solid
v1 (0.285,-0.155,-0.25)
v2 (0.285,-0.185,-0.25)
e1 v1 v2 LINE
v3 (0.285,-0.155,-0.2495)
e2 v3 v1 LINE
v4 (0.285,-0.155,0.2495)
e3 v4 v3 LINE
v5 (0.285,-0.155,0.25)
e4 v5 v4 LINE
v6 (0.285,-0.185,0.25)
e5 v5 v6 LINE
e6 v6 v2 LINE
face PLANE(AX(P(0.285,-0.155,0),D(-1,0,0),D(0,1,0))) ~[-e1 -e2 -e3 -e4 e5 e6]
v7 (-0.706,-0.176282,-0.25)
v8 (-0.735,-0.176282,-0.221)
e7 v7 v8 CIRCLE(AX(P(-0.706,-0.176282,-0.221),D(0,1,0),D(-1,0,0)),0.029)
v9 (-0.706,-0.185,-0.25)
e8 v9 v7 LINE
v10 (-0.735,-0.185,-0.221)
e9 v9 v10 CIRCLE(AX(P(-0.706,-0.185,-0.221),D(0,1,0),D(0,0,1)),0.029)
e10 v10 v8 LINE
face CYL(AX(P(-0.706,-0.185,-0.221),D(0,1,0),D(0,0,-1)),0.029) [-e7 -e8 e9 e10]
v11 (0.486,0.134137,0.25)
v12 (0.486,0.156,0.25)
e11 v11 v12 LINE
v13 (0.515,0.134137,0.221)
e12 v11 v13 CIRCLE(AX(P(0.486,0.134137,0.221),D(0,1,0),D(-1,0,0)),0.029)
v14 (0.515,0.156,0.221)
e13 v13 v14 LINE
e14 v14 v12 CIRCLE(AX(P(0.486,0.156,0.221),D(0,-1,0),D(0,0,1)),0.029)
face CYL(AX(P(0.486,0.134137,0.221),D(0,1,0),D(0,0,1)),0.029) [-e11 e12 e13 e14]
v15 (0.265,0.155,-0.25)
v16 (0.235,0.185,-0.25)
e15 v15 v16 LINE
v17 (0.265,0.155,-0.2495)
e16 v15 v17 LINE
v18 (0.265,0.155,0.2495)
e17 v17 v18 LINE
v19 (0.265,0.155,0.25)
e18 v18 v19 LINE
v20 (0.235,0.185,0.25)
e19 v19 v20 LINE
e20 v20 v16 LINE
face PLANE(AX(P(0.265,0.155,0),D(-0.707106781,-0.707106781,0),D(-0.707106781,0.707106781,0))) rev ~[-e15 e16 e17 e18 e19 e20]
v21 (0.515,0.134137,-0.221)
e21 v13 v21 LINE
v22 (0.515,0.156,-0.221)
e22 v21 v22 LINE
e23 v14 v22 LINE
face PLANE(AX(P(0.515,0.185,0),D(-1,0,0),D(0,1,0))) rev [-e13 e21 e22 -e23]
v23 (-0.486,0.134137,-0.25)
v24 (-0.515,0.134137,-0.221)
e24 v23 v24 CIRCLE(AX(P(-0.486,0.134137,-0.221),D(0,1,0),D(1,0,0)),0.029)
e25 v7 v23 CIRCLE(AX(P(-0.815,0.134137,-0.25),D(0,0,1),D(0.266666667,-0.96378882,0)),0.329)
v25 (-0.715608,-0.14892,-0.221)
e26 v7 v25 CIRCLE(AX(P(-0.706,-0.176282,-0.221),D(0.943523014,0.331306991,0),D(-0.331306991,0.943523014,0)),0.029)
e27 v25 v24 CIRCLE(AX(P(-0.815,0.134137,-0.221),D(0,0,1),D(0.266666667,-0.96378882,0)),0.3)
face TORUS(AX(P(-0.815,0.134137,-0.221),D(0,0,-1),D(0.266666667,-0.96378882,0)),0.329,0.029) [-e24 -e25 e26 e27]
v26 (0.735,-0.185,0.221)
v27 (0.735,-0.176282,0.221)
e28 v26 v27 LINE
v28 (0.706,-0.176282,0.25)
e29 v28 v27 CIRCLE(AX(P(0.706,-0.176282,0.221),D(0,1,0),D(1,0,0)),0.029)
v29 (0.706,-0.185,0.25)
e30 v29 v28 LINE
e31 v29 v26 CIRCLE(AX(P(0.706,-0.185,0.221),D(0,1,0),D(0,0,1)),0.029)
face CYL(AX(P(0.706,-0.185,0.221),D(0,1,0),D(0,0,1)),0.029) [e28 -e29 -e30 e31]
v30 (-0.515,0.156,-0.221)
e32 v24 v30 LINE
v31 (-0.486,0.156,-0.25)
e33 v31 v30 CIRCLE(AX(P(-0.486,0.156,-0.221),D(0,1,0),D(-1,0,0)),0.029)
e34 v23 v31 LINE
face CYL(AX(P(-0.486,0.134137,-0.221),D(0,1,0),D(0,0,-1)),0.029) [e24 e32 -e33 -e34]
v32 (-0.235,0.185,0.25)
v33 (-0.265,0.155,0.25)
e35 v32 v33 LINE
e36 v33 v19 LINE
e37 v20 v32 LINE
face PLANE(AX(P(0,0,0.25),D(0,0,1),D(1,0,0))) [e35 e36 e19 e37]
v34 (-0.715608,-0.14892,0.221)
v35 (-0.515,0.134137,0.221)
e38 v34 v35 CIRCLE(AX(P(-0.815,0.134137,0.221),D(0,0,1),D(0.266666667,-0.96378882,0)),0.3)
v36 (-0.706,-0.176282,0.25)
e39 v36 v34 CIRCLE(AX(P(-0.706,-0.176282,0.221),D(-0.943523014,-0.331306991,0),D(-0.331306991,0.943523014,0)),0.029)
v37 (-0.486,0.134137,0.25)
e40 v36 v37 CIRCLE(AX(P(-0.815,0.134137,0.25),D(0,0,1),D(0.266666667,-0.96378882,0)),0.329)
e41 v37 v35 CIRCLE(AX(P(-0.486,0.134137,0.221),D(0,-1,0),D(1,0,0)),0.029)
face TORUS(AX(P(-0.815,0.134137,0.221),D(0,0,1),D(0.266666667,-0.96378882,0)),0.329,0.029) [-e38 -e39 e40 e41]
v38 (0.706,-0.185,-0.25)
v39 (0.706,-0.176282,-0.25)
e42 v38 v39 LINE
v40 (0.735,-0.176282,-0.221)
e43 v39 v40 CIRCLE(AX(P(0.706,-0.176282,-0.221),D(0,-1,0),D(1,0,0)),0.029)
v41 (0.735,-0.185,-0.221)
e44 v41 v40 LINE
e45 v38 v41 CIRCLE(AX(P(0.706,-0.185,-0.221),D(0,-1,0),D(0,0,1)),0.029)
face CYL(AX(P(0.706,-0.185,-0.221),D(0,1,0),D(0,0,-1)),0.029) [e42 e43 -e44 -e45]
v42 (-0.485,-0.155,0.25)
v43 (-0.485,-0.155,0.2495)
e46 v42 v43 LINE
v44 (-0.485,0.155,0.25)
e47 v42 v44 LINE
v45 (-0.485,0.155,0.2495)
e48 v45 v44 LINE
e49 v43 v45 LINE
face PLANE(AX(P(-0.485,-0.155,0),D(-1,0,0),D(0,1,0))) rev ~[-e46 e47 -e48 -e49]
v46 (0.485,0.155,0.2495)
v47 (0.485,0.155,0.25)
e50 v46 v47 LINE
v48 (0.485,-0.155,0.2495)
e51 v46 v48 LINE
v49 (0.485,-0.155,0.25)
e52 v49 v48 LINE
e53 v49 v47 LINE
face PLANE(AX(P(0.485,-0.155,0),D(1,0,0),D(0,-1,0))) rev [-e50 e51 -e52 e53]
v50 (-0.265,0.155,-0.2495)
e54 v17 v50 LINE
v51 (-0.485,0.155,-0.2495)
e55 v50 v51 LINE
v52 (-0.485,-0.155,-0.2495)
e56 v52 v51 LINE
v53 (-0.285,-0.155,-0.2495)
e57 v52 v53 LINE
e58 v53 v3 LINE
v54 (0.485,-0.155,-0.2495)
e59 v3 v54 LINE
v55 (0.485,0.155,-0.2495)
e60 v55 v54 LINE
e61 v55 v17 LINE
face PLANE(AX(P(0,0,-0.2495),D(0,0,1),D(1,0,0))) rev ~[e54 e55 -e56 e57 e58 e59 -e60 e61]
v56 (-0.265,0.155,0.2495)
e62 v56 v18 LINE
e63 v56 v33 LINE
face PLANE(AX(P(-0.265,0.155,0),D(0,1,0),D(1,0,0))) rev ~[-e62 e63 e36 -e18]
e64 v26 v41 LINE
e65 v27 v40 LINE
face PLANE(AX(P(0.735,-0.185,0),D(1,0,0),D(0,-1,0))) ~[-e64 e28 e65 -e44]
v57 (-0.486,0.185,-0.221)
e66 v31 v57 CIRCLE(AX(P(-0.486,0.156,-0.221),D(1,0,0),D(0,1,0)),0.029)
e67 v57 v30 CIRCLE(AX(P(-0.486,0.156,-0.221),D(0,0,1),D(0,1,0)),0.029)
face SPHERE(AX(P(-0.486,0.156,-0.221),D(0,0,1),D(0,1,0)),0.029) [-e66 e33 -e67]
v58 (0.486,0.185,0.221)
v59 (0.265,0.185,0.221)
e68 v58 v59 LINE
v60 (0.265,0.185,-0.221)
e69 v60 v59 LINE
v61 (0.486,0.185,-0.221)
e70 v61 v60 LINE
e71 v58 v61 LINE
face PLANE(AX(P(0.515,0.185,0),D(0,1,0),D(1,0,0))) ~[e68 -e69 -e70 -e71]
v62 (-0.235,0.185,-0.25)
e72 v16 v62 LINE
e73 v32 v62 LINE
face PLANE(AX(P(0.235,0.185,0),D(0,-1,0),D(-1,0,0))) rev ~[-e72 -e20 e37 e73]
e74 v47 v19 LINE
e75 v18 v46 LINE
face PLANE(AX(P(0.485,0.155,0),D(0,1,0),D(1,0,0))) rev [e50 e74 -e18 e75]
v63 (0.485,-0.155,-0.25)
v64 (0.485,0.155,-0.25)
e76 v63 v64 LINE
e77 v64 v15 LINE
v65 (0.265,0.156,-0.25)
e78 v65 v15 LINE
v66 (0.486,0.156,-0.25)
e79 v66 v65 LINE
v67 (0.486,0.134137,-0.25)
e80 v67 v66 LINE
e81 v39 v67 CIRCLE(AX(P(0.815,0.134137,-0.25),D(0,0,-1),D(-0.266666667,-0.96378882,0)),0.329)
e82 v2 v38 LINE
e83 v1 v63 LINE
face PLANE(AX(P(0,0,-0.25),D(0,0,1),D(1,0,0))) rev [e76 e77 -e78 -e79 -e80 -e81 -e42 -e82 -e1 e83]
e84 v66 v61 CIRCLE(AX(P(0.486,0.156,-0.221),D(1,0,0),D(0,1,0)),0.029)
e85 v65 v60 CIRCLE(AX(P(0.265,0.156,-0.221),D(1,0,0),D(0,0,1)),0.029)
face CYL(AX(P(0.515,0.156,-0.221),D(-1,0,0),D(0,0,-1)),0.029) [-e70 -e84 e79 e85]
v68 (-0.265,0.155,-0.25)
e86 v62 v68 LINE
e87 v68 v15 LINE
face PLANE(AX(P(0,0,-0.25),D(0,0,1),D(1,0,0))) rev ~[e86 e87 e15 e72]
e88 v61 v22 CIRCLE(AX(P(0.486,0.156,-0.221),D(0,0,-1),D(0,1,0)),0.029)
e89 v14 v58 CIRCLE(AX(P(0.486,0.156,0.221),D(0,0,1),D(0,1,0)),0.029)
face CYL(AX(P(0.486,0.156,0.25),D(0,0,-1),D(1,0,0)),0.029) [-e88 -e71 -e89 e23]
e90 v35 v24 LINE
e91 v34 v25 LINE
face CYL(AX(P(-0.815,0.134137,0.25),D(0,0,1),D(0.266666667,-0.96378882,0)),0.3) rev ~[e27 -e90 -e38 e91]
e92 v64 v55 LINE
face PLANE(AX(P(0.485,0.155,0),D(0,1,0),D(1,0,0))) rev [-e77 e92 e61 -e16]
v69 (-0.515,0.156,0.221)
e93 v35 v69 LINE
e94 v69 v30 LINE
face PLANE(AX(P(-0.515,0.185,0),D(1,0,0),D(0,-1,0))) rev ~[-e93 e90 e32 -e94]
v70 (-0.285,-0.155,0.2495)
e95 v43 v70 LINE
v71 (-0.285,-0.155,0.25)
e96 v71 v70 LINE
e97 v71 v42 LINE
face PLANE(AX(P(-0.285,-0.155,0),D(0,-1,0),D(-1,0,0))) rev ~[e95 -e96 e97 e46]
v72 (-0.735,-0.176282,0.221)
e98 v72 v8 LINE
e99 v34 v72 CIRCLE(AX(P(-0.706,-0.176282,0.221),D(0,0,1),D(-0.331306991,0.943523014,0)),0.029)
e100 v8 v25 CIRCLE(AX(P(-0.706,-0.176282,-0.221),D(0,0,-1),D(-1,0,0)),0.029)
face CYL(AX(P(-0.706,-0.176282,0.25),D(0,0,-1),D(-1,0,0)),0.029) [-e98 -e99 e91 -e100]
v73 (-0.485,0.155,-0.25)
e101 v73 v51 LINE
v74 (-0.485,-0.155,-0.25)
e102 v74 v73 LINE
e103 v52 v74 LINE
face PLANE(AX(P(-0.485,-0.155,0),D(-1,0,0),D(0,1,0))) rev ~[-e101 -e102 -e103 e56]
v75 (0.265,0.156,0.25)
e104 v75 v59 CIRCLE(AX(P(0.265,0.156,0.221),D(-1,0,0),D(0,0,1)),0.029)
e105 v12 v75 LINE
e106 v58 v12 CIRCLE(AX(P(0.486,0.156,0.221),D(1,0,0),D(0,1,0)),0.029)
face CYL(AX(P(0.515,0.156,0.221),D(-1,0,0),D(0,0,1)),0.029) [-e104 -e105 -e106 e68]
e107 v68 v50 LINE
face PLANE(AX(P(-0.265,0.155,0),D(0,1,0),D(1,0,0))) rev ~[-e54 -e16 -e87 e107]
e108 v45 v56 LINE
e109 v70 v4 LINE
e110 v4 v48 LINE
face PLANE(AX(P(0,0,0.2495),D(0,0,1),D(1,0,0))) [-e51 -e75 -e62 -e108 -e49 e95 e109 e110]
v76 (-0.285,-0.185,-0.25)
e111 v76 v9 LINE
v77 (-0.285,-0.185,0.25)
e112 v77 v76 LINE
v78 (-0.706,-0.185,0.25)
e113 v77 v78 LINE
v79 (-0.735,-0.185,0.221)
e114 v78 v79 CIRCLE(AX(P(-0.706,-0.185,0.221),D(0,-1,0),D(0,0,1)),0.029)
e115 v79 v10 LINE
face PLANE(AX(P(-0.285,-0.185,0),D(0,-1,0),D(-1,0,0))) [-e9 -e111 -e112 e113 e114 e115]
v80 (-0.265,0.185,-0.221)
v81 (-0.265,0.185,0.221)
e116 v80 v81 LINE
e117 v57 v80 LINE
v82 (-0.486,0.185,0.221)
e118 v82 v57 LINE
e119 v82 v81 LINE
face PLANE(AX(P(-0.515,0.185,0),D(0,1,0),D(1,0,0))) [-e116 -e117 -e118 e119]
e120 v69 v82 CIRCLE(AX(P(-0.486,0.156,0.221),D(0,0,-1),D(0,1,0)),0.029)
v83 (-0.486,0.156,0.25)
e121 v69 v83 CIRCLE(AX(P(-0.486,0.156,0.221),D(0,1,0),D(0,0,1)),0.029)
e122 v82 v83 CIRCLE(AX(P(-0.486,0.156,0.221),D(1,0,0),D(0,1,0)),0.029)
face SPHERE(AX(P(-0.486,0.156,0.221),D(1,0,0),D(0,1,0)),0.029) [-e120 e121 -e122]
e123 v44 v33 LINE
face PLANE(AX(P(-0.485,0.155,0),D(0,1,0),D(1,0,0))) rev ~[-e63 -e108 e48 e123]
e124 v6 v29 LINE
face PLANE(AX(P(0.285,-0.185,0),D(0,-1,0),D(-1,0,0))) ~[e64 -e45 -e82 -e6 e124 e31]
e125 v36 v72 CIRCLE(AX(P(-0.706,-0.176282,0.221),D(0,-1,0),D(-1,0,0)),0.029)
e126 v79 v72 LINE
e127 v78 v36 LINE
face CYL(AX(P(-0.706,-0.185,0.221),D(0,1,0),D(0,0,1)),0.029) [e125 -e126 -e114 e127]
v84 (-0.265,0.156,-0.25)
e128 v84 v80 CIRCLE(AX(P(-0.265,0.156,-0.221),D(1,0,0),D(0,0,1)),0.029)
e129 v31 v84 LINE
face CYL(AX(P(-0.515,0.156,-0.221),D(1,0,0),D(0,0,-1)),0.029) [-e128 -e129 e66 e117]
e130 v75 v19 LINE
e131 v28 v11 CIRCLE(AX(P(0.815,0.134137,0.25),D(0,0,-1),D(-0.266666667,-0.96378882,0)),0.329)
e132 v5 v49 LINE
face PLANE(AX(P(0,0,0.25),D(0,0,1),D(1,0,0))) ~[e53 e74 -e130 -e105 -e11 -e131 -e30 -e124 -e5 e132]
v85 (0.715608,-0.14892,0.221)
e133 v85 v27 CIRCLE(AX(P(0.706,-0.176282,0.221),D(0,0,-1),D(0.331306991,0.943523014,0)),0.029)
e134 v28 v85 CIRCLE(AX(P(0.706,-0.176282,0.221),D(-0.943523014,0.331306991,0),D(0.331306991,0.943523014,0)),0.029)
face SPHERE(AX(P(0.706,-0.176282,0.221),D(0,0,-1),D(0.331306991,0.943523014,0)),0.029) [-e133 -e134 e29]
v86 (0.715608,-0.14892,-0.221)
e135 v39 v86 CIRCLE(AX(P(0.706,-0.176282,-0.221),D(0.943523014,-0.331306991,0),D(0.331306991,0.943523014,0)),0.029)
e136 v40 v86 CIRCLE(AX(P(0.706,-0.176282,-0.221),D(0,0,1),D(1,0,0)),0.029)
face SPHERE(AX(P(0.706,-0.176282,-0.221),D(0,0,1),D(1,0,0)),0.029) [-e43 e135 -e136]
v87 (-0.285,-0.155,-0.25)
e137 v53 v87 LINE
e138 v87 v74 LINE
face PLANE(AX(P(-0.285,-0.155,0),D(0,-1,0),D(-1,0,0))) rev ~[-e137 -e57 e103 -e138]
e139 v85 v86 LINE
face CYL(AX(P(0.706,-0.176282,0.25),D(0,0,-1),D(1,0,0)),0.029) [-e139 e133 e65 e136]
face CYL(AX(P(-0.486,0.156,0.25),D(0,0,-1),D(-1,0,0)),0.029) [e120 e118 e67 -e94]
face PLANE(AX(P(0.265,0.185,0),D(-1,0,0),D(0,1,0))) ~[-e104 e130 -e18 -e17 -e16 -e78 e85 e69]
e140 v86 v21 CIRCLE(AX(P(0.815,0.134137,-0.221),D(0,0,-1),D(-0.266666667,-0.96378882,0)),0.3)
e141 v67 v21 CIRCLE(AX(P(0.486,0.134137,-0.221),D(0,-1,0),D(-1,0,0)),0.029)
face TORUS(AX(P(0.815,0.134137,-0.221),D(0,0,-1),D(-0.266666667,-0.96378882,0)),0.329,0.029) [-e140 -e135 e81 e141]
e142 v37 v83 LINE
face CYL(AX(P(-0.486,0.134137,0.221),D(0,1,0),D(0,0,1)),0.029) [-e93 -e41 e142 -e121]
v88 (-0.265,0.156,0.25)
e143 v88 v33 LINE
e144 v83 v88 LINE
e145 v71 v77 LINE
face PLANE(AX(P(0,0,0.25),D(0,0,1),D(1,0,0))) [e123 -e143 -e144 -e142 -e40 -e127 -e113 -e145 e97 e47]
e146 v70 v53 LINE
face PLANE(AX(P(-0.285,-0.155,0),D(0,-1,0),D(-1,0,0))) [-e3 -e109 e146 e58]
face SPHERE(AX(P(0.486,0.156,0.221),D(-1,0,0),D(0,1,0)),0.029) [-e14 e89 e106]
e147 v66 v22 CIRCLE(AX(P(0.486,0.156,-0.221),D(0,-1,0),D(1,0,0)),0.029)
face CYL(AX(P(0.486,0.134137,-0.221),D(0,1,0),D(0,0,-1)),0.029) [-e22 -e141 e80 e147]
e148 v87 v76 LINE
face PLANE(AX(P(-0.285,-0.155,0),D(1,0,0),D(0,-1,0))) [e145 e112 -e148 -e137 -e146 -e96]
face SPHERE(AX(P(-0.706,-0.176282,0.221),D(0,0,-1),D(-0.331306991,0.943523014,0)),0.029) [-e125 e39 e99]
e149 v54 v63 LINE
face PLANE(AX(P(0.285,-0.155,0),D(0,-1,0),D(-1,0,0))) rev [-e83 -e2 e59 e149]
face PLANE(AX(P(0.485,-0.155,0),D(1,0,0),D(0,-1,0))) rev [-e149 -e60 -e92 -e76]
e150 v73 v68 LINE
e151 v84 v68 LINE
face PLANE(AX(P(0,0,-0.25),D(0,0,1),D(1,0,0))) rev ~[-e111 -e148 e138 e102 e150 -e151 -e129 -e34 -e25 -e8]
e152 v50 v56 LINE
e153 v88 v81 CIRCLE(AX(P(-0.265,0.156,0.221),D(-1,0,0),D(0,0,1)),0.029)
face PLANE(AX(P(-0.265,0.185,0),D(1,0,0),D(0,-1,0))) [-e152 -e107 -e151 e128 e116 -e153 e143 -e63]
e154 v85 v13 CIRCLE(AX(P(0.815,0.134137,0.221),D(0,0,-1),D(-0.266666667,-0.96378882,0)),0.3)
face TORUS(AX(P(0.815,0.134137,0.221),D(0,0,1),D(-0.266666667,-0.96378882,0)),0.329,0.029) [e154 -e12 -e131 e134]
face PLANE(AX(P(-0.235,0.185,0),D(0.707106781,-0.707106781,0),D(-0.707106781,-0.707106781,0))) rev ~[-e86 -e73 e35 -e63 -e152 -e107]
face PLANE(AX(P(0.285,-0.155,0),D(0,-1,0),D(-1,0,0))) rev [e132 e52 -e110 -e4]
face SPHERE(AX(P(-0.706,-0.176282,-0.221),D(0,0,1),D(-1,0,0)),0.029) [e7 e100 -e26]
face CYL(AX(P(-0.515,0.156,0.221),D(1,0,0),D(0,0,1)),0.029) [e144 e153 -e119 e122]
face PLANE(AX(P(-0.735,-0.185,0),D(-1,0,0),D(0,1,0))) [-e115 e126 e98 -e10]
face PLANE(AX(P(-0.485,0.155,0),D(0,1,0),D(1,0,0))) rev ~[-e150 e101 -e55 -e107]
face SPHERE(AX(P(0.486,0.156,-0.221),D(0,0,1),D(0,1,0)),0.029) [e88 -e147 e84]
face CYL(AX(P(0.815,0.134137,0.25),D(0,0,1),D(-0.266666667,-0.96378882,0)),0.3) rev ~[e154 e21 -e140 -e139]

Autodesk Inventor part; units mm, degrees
ref_plane "YZ Plane" through (0, 0, 0) normal (1, 0, 0) x (0, 1, 0)
ref_plane "XZ Plane" through (0, 0, 0) normal (0, 1, 0) x (-1, 0, 0)
ref_plane "XY Plane" through (0, 0, 0) normal (0, 0, 1) x (1, 0, 0)
sketch "Sketch10" plane through (0, 0, 0) normal (0, 0, 1) x (1, 0, 0)
  line L0 (-0.485, 0.155) -> (0.485, 0.155)
  line L1 (0.485, 0.155) -> (0.485, -0.155)
  line L2 (0.485, -0.155) -> (-0.485, -0.155)
  line L3 (-0.485, -0.155) -> (-0.485, 0.155)
  line L4 (-0.265, 0.155) -> (-0.485, 0.155)
  line L5 (-0.515, 0.185) -> (-0.265, 0.185)
  line L6 (-0.265, 0.185) -> (-0.265, 0.155)
  line L7 (-0.515, 0.185) -> (-0.515, -0.155)
  line L8 (-0.485, -0.155) -> (-0.485, 0.155)
  line L9 (-0.285, -0.155) -> (-0.285, -0.185)
  line L10 (-0.285, -0.185) -> (-0.735, -0.185)
  line L11 (-0.735, -0.185) -> (-0.735, -0.155)
  line L12 (-0.735, -0.155) -> (-0.515, -0.155)
  line L13 (-0.485, -0.155) -> (-0.285, -0.155)
  line L14 (-0.265, 0.155) -> (0.265, 0.155)
  line L15 (0.265, 0.155) -> (0.235, 0.185)
  line L16 (0.235, 0.185) -> (-0.235, 0.185)
  line L17 (-0.235, 0.185) -> (-0.265, 0.155)
  point P0 (0, 0)
  point P1 (0, 0.155)
  point P2 (-0.485, 0)
  point P3 (0, 0.185)
  dimension "d11" = 0.2
  dimension "d12" = 0.45
  dimension "d13" = 0.03
  dimension "d14" = 0.03
  dimension "d15" = 0.25
  dimension "d16" = 45
  dimension "d19" = 0.03
  dimension "d21" = 1
  dimension "d22" = 0.37
extrude "Extrusion4" add sketch "Sketch10" along normal mid plane 0.499 contours L0 L1 L2 L3
extrude "Extrusion5" add sketch "Sketch10" along normal mid plane 0.5 contours L3 L2 L9 L10 L11 L12 L7 L5 L6 L0 | L17 L16 L15 L0
fillet "Fillet2" radius 0.3 1 edges at (-0.515, -0.155, 0)
fillet "Fillet3" radius 0.029 10 edges at (-0.39, 0.185, 0.25) (-0.515, 0.185, 0) (-0.39, 0.185, -0.25) (-0.5763, -0.0475, -0.25) (-0.515, 0.1596, -0.25) (-0.5763, -0.0475, 0.25) (-0.515, 0.1596, 0.25) (-0.735, -0.17, 0.25) (-0.735, -0.155, 0) (-0.735, -0.17, -0.25)
mirror "Mirror1" about plane through (0, 0, 0) normal (1, 0, 0) of "Extrusion5", "Fillet2", "Fillet3"
equation "\"d14\" = d13"
equation "\"d19\" = d13"
properties part number "AC0402JR-0775KL Resistor"
